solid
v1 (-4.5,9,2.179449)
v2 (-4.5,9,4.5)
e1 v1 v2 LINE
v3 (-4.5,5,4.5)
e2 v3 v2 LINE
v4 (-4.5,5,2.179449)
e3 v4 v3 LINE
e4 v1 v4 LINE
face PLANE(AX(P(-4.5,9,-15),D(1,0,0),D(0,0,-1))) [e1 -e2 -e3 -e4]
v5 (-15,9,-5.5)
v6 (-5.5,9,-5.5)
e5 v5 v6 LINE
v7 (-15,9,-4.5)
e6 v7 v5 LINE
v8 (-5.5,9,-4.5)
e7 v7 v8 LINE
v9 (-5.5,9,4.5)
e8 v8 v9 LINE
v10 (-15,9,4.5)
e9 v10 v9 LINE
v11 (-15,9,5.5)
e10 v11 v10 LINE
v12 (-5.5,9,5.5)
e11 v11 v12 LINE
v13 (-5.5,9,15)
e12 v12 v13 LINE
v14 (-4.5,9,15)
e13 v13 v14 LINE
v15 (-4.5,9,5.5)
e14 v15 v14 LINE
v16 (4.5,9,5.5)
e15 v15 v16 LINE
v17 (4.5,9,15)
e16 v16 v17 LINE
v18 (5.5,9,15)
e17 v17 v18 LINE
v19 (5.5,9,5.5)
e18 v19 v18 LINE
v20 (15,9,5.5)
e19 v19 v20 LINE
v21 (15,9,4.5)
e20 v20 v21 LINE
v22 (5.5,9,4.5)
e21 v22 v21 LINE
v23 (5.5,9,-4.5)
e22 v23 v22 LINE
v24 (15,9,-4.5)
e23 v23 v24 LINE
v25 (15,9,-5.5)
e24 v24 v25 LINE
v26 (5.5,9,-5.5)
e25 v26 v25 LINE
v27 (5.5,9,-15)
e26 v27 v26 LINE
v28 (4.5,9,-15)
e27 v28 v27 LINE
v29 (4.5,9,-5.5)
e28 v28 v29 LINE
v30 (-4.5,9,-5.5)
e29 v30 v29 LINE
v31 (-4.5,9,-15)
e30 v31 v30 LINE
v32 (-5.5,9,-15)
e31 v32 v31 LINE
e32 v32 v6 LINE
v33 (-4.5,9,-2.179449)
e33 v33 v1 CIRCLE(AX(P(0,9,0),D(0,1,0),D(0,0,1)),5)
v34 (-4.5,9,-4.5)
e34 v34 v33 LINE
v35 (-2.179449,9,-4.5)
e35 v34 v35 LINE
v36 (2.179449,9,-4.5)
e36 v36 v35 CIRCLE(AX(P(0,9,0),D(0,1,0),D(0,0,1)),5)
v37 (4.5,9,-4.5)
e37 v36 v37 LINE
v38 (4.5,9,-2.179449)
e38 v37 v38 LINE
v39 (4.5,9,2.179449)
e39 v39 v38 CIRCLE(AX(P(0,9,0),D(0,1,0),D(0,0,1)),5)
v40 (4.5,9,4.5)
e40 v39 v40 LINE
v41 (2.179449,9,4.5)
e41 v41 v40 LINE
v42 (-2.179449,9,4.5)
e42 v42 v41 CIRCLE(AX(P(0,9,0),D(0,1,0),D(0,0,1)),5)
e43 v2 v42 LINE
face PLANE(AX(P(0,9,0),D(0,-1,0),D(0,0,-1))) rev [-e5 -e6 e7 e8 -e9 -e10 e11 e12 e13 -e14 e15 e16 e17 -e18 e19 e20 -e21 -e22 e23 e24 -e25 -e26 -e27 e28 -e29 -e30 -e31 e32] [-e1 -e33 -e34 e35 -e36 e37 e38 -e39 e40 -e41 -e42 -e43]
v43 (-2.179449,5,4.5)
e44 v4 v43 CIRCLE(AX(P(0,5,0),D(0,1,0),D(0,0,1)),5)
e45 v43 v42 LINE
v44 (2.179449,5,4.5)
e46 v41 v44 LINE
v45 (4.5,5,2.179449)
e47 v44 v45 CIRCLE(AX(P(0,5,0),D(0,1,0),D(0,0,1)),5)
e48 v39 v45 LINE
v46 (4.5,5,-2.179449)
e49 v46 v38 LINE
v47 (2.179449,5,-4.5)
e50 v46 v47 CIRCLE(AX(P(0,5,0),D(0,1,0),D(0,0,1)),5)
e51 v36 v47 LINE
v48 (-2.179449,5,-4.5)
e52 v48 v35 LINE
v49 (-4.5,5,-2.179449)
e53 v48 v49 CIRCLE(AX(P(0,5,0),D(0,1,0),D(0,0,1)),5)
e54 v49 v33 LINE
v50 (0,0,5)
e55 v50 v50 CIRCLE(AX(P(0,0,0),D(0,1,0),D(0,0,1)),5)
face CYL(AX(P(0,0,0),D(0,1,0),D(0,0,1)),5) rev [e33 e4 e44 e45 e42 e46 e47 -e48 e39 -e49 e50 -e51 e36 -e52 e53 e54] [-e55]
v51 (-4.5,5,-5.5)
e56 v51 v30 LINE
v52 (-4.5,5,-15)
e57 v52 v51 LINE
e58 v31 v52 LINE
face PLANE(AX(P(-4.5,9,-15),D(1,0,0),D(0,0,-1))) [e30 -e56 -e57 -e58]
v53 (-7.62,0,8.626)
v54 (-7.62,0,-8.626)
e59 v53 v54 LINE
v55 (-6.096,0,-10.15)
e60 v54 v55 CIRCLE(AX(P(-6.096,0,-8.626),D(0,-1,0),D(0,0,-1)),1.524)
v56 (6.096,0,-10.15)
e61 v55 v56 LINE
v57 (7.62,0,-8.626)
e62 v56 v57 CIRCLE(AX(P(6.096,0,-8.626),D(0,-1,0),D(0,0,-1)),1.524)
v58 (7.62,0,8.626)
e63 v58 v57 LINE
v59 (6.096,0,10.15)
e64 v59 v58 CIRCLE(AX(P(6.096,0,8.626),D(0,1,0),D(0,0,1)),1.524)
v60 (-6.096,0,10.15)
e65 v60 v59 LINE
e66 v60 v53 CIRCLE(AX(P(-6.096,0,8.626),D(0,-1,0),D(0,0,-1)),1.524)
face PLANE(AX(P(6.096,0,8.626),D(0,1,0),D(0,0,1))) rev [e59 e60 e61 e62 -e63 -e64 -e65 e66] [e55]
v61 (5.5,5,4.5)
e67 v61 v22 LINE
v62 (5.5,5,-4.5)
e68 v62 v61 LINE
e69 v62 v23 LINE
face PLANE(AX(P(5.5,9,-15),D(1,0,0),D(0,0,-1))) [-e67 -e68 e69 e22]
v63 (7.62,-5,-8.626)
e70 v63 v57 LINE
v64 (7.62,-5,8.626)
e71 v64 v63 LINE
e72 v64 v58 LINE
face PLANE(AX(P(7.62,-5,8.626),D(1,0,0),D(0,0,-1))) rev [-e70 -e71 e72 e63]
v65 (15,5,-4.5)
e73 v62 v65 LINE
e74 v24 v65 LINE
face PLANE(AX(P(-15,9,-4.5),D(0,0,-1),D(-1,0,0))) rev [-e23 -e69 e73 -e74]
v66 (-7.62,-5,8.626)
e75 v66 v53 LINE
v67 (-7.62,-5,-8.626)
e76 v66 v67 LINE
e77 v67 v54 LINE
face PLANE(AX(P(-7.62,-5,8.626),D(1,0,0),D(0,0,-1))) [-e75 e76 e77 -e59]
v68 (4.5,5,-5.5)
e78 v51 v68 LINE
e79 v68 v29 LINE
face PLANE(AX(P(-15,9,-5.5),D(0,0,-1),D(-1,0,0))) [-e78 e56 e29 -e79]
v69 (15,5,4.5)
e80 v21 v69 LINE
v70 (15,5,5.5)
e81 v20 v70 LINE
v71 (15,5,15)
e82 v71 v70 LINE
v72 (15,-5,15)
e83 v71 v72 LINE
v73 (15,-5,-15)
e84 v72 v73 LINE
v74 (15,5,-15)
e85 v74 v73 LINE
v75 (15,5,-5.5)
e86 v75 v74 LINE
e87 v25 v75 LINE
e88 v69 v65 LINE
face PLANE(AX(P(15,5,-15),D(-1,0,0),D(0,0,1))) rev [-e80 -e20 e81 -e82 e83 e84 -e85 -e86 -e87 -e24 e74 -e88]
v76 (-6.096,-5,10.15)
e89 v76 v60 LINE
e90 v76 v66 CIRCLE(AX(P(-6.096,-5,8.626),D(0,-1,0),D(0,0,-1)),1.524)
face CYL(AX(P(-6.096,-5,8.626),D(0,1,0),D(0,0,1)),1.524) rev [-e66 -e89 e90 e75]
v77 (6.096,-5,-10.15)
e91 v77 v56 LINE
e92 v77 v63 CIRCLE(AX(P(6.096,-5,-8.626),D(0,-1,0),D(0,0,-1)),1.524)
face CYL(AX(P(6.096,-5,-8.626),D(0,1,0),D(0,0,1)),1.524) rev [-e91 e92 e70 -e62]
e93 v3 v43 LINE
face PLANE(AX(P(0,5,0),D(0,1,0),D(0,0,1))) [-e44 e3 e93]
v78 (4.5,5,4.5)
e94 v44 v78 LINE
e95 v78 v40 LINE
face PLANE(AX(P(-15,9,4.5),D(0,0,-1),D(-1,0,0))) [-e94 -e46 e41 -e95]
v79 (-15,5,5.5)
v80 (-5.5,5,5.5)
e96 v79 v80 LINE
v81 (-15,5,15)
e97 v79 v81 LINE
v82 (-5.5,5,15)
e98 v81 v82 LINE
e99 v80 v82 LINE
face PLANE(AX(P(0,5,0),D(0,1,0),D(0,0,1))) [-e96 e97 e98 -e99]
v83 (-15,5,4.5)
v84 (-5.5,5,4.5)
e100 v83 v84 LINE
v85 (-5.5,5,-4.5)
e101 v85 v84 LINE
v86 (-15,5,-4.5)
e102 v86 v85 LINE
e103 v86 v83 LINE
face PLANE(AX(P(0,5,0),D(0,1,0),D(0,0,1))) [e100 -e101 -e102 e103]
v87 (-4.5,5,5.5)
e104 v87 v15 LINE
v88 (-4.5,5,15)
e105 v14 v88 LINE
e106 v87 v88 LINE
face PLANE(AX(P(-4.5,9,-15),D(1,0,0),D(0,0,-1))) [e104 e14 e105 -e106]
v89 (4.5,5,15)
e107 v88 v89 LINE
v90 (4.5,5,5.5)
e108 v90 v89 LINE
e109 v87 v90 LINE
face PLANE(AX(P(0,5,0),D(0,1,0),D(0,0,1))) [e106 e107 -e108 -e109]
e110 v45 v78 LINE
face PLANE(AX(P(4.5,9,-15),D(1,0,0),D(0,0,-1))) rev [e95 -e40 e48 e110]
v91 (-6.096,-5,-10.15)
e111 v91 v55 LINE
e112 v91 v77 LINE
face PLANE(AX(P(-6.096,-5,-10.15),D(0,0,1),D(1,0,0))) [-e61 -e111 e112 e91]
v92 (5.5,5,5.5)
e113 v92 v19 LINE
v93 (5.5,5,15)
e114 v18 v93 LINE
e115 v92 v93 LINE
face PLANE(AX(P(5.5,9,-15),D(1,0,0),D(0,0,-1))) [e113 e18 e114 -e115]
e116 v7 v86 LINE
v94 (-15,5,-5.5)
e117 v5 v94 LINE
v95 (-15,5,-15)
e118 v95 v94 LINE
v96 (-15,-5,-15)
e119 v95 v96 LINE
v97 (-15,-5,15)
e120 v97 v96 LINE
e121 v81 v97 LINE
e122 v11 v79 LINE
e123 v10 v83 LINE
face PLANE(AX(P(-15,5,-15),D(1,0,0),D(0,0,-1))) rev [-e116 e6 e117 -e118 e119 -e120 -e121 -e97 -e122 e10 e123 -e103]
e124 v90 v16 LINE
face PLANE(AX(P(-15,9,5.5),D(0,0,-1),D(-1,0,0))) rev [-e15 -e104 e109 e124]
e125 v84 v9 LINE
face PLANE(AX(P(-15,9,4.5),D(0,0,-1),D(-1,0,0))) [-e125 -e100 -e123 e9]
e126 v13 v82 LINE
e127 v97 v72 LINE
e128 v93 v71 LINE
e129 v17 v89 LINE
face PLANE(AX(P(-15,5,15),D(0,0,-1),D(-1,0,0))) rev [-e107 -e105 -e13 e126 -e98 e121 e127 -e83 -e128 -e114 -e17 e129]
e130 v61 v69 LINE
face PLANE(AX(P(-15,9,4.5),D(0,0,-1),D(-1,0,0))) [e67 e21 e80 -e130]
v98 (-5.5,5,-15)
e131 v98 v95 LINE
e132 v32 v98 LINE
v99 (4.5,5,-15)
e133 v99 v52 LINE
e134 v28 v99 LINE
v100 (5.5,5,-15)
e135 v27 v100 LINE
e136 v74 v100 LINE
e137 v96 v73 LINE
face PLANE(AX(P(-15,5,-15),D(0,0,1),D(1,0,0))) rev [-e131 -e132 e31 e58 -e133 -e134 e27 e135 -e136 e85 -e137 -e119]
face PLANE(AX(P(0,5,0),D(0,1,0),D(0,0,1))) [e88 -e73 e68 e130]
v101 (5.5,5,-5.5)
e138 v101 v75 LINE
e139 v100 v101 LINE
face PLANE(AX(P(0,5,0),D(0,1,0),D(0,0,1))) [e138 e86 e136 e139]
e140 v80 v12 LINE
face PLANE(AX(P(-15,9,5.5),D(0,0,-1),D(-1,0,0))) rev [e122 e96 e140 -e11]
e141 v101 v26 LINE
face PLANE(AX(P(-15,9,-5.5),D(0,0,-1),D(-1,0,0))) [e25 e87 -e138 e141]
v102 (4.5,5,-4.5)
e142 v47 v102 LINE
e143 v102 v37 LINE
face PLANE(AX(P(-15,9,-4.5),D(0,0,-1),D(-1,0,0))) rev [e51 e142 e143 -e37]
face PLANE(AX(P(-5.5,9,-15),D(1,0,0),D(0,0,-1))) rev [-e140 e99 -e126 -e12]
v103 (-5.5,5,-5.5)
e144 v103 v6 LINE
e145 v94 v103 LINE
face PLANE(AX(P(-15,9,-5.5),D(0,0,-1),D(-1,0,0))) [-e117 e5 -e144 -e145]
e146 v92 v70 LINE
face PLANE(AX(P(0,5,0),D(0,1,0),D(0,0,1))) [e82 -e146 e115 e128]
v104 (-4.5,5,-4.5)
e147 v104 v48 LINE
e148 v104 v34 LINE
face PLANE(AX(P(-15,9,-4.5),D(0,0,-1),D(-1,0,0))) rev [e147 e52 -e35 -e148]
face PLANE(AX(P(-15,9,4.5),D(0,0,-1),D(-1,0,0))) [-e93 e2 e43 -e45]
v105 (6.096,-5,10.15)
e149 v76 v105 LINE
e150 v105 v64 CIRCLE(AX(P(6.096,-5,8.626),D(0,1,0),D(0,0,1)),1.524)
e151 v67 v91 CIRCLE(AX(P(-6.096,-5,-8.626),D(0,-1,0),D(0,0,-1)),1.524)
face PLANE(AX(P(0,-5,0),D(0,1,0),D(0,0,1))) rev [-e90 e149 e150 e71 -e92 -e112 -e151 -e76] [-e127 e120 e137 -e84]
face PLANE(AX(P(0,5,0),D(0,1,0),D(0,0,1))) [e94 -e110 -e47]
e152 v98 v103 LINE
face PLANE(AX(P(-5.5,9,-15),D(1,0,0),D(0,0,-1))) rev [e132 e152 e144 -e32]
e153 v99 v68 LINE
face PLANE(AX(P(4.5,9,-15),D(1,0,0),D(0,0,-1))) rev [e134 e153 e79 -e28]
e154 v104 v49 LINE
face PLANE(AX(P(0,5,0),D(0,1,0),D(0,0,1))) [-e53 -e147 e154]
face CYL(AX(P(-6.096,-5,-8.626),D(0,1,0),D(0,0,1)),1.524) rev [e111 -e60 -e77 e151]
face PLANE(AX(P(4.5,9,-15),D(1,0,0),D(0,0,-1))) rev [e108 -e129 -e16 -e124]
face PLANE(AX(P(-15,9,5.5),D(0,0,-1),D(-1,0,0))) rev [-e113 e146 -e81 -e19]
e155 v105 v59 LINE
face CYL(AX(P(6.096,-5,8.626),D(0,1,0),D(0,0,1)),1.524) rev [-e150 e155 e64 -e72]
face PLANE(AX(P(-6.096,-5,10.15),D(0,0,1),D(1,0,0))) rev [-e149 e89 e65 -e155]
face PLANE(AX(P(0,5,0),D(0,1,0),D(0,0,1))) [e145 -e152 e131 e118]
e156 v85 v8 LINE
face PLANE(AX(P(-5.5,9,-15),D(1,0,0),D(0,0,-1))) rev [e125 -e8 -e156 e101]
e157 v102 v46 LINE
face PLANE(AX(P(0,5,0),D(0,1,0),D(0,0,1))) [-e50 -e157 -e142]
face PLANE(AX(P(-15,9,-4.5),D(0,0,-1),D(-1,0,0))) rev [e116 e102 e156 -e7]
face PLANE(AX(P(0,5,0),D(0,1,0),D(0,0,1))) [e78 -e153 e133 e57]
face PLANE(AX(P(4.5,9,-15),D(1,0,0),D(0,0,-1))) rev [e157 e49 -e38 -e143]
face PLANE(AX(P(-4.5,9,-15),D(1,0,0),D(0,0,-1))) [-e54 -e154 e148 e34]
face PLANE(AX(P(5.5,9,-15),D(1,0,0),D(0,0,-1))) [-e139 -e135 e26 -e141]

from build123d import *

# Parameters (mm, degrees)
SKETCH1_W                   = 30
SKETCH1_H                   = 30
BOSS_EXTRUDE1_DEPTH         = 5
SKETCH2_W                   = 1
SKETCH2_H                   = 30
BOSS_EXTRUDE2_DEPTH         = 4
LPATTERN1_COUNT             = 2
LPATTERN1_PITCH             = 10
CIRPATTERN1_COUNT           = 2
CIRPATTERN1_ANGLE           = 90
CIRPATTERN1_COPY_1_SKETCH_W = 1
CIRPATTERN1_COPY_1_SKETCH_H = 30
CIRPATTERN1_COPY_1_DEPTH    = 4
CUT_EXTRUDE2_DEPTH          = 22.794494718
CUT_EXTRUDE2_DEPTH_BACK     = 22.794494718
SKETCH4_R                   = 5
SKETCH8_W                   = 30
SKETCH8_H                   = 30
BOSS_EXTRUDE3_DEPTH         = 5
CUT_EXTRUDE3_DEPTH          = 5


# Read off the part's stored shape, not the designer's step: Cut-Extrude3
with BuildPart() as part:
    # Sketch1 → Boss-Extrude1 (new body)
    with BuildSketch(Plane(origin=(0, 0, 0), x_dir=(1, 0, 0), z_dir=(0, 1, 0))):
        Rectangle(SKETCH1_W, SKETCH1_H)
    extrude(amount=BOSS_EXTRUDE1_DEPTH)

    # Sketch2 → Boss-Extrude2 (add)
    with BuildSketch(Plane(origin=(0, 5, 0), x_dir=(1, 0, 0), z_dir=(0, 1, 0))):
        with Locations((-5, 0)):
            Rectangle(SKETCH2_W, SKETCH2_H)
    boss_extrude2 = extrude(amount=BOSS_EXTRUDE2_DEPTH)

    # LPattern1: Boss-Extrude2 ×2
    with Locations(*[(i * LPATTERN1_PITCH, 0, 0) for i in range(1, LPATTERN1_COUNT)]):
        add(boss_extrude2)

    # CirPattern1: Boss-Extrude2 ×2 about axis
    cirpattern1_axis = Axis((0, 5, 0), (0, 1, 0))
    for i in range(1, CIRPATTERN1_COUNT):
        add(boss_extrude2.rotate(cirpattern1_axis, i * CIRPATTERN1_ANGLE / (CIRPATTERN1_COUNT - 1)))

    # CirPattern1 copy 1 sketch → CirPattern1 copy 1 (add)
    with BuildSketch(Plane(origin=(0, 5, -10), x_dir=(0, 0, -1), z_dir=(0, 1, 0))):
        with Locations((-5, 0)):
            Rectangle(CIRPATTERN1_COPY_1_SKETCH_W, CIRPATTERN1_COPY_1_SKETCH_H)
    extrude(amount=CIRPATTERN1_COPY_1_DEPTH)

    # Sketch4 → Cut-Extrude2 (cut, two sides: drawn at the far end of the back side and taken through both)
    with BuildSketch(Plane(origin=(0, 5, 0), x_dir=(1, 0, 0), z_dir=(0, 1, 0)).offset(-CUT_EXTRUDE2_DEPTH_BACK)):
        with Locations(Location((0, 0, 0), (0, 0, 270))):
            Circle(SKETCH4_R)
    extrude(amount=CUT_EXTRUDE2_DEPTH + CUT_EXTRUDE2_DEPTH_BACK, mode=Mode.SUBTRACT)

    # Sketch8 → Boss-Extrude3 (add)
    with BuildSketch(Plane.XZ):
        Rectangle(SKETCH8_W, SKETCH8_H)
    extrude(amount=BOSS_EXTRUDE3_DEPTH)

    # Cut-Extrude3 outline → Cut-Extrude3 (cut)
    with BuildSketch(Plane.XZ):
        with BuildLine():
            ThreePointArc((7.62, 8.626), (7.173630735, 9.703630735), (6.096, 10.15))
            Line((6.096, 10.15), (-6.096, 10.15))
            ThreePointArc((-6.096, 10.15), (-7.173630735, 9.703630735), (-7.62, 8.626))
            Line((-7.62, 8.626), (-7.62, -8.626))
            ThreePointArc((-7.62, -8.626), (-7.173630735, -9.703630735), (-6.096, -10.15))
            Line((-6.096, -10.15), (6.096, -10.15))
            ThreePointArc((6.096, -10.15), (7.173630735, -9.703630735), (7.62, -8.626))
            Line((7.62, -8.626), (7.62, 8.626))
        make_face()
    extrude(amount=CUT_EXTRUDE3_DEPTH, mode=Mode.SUBTRACT)


solid = part.part
